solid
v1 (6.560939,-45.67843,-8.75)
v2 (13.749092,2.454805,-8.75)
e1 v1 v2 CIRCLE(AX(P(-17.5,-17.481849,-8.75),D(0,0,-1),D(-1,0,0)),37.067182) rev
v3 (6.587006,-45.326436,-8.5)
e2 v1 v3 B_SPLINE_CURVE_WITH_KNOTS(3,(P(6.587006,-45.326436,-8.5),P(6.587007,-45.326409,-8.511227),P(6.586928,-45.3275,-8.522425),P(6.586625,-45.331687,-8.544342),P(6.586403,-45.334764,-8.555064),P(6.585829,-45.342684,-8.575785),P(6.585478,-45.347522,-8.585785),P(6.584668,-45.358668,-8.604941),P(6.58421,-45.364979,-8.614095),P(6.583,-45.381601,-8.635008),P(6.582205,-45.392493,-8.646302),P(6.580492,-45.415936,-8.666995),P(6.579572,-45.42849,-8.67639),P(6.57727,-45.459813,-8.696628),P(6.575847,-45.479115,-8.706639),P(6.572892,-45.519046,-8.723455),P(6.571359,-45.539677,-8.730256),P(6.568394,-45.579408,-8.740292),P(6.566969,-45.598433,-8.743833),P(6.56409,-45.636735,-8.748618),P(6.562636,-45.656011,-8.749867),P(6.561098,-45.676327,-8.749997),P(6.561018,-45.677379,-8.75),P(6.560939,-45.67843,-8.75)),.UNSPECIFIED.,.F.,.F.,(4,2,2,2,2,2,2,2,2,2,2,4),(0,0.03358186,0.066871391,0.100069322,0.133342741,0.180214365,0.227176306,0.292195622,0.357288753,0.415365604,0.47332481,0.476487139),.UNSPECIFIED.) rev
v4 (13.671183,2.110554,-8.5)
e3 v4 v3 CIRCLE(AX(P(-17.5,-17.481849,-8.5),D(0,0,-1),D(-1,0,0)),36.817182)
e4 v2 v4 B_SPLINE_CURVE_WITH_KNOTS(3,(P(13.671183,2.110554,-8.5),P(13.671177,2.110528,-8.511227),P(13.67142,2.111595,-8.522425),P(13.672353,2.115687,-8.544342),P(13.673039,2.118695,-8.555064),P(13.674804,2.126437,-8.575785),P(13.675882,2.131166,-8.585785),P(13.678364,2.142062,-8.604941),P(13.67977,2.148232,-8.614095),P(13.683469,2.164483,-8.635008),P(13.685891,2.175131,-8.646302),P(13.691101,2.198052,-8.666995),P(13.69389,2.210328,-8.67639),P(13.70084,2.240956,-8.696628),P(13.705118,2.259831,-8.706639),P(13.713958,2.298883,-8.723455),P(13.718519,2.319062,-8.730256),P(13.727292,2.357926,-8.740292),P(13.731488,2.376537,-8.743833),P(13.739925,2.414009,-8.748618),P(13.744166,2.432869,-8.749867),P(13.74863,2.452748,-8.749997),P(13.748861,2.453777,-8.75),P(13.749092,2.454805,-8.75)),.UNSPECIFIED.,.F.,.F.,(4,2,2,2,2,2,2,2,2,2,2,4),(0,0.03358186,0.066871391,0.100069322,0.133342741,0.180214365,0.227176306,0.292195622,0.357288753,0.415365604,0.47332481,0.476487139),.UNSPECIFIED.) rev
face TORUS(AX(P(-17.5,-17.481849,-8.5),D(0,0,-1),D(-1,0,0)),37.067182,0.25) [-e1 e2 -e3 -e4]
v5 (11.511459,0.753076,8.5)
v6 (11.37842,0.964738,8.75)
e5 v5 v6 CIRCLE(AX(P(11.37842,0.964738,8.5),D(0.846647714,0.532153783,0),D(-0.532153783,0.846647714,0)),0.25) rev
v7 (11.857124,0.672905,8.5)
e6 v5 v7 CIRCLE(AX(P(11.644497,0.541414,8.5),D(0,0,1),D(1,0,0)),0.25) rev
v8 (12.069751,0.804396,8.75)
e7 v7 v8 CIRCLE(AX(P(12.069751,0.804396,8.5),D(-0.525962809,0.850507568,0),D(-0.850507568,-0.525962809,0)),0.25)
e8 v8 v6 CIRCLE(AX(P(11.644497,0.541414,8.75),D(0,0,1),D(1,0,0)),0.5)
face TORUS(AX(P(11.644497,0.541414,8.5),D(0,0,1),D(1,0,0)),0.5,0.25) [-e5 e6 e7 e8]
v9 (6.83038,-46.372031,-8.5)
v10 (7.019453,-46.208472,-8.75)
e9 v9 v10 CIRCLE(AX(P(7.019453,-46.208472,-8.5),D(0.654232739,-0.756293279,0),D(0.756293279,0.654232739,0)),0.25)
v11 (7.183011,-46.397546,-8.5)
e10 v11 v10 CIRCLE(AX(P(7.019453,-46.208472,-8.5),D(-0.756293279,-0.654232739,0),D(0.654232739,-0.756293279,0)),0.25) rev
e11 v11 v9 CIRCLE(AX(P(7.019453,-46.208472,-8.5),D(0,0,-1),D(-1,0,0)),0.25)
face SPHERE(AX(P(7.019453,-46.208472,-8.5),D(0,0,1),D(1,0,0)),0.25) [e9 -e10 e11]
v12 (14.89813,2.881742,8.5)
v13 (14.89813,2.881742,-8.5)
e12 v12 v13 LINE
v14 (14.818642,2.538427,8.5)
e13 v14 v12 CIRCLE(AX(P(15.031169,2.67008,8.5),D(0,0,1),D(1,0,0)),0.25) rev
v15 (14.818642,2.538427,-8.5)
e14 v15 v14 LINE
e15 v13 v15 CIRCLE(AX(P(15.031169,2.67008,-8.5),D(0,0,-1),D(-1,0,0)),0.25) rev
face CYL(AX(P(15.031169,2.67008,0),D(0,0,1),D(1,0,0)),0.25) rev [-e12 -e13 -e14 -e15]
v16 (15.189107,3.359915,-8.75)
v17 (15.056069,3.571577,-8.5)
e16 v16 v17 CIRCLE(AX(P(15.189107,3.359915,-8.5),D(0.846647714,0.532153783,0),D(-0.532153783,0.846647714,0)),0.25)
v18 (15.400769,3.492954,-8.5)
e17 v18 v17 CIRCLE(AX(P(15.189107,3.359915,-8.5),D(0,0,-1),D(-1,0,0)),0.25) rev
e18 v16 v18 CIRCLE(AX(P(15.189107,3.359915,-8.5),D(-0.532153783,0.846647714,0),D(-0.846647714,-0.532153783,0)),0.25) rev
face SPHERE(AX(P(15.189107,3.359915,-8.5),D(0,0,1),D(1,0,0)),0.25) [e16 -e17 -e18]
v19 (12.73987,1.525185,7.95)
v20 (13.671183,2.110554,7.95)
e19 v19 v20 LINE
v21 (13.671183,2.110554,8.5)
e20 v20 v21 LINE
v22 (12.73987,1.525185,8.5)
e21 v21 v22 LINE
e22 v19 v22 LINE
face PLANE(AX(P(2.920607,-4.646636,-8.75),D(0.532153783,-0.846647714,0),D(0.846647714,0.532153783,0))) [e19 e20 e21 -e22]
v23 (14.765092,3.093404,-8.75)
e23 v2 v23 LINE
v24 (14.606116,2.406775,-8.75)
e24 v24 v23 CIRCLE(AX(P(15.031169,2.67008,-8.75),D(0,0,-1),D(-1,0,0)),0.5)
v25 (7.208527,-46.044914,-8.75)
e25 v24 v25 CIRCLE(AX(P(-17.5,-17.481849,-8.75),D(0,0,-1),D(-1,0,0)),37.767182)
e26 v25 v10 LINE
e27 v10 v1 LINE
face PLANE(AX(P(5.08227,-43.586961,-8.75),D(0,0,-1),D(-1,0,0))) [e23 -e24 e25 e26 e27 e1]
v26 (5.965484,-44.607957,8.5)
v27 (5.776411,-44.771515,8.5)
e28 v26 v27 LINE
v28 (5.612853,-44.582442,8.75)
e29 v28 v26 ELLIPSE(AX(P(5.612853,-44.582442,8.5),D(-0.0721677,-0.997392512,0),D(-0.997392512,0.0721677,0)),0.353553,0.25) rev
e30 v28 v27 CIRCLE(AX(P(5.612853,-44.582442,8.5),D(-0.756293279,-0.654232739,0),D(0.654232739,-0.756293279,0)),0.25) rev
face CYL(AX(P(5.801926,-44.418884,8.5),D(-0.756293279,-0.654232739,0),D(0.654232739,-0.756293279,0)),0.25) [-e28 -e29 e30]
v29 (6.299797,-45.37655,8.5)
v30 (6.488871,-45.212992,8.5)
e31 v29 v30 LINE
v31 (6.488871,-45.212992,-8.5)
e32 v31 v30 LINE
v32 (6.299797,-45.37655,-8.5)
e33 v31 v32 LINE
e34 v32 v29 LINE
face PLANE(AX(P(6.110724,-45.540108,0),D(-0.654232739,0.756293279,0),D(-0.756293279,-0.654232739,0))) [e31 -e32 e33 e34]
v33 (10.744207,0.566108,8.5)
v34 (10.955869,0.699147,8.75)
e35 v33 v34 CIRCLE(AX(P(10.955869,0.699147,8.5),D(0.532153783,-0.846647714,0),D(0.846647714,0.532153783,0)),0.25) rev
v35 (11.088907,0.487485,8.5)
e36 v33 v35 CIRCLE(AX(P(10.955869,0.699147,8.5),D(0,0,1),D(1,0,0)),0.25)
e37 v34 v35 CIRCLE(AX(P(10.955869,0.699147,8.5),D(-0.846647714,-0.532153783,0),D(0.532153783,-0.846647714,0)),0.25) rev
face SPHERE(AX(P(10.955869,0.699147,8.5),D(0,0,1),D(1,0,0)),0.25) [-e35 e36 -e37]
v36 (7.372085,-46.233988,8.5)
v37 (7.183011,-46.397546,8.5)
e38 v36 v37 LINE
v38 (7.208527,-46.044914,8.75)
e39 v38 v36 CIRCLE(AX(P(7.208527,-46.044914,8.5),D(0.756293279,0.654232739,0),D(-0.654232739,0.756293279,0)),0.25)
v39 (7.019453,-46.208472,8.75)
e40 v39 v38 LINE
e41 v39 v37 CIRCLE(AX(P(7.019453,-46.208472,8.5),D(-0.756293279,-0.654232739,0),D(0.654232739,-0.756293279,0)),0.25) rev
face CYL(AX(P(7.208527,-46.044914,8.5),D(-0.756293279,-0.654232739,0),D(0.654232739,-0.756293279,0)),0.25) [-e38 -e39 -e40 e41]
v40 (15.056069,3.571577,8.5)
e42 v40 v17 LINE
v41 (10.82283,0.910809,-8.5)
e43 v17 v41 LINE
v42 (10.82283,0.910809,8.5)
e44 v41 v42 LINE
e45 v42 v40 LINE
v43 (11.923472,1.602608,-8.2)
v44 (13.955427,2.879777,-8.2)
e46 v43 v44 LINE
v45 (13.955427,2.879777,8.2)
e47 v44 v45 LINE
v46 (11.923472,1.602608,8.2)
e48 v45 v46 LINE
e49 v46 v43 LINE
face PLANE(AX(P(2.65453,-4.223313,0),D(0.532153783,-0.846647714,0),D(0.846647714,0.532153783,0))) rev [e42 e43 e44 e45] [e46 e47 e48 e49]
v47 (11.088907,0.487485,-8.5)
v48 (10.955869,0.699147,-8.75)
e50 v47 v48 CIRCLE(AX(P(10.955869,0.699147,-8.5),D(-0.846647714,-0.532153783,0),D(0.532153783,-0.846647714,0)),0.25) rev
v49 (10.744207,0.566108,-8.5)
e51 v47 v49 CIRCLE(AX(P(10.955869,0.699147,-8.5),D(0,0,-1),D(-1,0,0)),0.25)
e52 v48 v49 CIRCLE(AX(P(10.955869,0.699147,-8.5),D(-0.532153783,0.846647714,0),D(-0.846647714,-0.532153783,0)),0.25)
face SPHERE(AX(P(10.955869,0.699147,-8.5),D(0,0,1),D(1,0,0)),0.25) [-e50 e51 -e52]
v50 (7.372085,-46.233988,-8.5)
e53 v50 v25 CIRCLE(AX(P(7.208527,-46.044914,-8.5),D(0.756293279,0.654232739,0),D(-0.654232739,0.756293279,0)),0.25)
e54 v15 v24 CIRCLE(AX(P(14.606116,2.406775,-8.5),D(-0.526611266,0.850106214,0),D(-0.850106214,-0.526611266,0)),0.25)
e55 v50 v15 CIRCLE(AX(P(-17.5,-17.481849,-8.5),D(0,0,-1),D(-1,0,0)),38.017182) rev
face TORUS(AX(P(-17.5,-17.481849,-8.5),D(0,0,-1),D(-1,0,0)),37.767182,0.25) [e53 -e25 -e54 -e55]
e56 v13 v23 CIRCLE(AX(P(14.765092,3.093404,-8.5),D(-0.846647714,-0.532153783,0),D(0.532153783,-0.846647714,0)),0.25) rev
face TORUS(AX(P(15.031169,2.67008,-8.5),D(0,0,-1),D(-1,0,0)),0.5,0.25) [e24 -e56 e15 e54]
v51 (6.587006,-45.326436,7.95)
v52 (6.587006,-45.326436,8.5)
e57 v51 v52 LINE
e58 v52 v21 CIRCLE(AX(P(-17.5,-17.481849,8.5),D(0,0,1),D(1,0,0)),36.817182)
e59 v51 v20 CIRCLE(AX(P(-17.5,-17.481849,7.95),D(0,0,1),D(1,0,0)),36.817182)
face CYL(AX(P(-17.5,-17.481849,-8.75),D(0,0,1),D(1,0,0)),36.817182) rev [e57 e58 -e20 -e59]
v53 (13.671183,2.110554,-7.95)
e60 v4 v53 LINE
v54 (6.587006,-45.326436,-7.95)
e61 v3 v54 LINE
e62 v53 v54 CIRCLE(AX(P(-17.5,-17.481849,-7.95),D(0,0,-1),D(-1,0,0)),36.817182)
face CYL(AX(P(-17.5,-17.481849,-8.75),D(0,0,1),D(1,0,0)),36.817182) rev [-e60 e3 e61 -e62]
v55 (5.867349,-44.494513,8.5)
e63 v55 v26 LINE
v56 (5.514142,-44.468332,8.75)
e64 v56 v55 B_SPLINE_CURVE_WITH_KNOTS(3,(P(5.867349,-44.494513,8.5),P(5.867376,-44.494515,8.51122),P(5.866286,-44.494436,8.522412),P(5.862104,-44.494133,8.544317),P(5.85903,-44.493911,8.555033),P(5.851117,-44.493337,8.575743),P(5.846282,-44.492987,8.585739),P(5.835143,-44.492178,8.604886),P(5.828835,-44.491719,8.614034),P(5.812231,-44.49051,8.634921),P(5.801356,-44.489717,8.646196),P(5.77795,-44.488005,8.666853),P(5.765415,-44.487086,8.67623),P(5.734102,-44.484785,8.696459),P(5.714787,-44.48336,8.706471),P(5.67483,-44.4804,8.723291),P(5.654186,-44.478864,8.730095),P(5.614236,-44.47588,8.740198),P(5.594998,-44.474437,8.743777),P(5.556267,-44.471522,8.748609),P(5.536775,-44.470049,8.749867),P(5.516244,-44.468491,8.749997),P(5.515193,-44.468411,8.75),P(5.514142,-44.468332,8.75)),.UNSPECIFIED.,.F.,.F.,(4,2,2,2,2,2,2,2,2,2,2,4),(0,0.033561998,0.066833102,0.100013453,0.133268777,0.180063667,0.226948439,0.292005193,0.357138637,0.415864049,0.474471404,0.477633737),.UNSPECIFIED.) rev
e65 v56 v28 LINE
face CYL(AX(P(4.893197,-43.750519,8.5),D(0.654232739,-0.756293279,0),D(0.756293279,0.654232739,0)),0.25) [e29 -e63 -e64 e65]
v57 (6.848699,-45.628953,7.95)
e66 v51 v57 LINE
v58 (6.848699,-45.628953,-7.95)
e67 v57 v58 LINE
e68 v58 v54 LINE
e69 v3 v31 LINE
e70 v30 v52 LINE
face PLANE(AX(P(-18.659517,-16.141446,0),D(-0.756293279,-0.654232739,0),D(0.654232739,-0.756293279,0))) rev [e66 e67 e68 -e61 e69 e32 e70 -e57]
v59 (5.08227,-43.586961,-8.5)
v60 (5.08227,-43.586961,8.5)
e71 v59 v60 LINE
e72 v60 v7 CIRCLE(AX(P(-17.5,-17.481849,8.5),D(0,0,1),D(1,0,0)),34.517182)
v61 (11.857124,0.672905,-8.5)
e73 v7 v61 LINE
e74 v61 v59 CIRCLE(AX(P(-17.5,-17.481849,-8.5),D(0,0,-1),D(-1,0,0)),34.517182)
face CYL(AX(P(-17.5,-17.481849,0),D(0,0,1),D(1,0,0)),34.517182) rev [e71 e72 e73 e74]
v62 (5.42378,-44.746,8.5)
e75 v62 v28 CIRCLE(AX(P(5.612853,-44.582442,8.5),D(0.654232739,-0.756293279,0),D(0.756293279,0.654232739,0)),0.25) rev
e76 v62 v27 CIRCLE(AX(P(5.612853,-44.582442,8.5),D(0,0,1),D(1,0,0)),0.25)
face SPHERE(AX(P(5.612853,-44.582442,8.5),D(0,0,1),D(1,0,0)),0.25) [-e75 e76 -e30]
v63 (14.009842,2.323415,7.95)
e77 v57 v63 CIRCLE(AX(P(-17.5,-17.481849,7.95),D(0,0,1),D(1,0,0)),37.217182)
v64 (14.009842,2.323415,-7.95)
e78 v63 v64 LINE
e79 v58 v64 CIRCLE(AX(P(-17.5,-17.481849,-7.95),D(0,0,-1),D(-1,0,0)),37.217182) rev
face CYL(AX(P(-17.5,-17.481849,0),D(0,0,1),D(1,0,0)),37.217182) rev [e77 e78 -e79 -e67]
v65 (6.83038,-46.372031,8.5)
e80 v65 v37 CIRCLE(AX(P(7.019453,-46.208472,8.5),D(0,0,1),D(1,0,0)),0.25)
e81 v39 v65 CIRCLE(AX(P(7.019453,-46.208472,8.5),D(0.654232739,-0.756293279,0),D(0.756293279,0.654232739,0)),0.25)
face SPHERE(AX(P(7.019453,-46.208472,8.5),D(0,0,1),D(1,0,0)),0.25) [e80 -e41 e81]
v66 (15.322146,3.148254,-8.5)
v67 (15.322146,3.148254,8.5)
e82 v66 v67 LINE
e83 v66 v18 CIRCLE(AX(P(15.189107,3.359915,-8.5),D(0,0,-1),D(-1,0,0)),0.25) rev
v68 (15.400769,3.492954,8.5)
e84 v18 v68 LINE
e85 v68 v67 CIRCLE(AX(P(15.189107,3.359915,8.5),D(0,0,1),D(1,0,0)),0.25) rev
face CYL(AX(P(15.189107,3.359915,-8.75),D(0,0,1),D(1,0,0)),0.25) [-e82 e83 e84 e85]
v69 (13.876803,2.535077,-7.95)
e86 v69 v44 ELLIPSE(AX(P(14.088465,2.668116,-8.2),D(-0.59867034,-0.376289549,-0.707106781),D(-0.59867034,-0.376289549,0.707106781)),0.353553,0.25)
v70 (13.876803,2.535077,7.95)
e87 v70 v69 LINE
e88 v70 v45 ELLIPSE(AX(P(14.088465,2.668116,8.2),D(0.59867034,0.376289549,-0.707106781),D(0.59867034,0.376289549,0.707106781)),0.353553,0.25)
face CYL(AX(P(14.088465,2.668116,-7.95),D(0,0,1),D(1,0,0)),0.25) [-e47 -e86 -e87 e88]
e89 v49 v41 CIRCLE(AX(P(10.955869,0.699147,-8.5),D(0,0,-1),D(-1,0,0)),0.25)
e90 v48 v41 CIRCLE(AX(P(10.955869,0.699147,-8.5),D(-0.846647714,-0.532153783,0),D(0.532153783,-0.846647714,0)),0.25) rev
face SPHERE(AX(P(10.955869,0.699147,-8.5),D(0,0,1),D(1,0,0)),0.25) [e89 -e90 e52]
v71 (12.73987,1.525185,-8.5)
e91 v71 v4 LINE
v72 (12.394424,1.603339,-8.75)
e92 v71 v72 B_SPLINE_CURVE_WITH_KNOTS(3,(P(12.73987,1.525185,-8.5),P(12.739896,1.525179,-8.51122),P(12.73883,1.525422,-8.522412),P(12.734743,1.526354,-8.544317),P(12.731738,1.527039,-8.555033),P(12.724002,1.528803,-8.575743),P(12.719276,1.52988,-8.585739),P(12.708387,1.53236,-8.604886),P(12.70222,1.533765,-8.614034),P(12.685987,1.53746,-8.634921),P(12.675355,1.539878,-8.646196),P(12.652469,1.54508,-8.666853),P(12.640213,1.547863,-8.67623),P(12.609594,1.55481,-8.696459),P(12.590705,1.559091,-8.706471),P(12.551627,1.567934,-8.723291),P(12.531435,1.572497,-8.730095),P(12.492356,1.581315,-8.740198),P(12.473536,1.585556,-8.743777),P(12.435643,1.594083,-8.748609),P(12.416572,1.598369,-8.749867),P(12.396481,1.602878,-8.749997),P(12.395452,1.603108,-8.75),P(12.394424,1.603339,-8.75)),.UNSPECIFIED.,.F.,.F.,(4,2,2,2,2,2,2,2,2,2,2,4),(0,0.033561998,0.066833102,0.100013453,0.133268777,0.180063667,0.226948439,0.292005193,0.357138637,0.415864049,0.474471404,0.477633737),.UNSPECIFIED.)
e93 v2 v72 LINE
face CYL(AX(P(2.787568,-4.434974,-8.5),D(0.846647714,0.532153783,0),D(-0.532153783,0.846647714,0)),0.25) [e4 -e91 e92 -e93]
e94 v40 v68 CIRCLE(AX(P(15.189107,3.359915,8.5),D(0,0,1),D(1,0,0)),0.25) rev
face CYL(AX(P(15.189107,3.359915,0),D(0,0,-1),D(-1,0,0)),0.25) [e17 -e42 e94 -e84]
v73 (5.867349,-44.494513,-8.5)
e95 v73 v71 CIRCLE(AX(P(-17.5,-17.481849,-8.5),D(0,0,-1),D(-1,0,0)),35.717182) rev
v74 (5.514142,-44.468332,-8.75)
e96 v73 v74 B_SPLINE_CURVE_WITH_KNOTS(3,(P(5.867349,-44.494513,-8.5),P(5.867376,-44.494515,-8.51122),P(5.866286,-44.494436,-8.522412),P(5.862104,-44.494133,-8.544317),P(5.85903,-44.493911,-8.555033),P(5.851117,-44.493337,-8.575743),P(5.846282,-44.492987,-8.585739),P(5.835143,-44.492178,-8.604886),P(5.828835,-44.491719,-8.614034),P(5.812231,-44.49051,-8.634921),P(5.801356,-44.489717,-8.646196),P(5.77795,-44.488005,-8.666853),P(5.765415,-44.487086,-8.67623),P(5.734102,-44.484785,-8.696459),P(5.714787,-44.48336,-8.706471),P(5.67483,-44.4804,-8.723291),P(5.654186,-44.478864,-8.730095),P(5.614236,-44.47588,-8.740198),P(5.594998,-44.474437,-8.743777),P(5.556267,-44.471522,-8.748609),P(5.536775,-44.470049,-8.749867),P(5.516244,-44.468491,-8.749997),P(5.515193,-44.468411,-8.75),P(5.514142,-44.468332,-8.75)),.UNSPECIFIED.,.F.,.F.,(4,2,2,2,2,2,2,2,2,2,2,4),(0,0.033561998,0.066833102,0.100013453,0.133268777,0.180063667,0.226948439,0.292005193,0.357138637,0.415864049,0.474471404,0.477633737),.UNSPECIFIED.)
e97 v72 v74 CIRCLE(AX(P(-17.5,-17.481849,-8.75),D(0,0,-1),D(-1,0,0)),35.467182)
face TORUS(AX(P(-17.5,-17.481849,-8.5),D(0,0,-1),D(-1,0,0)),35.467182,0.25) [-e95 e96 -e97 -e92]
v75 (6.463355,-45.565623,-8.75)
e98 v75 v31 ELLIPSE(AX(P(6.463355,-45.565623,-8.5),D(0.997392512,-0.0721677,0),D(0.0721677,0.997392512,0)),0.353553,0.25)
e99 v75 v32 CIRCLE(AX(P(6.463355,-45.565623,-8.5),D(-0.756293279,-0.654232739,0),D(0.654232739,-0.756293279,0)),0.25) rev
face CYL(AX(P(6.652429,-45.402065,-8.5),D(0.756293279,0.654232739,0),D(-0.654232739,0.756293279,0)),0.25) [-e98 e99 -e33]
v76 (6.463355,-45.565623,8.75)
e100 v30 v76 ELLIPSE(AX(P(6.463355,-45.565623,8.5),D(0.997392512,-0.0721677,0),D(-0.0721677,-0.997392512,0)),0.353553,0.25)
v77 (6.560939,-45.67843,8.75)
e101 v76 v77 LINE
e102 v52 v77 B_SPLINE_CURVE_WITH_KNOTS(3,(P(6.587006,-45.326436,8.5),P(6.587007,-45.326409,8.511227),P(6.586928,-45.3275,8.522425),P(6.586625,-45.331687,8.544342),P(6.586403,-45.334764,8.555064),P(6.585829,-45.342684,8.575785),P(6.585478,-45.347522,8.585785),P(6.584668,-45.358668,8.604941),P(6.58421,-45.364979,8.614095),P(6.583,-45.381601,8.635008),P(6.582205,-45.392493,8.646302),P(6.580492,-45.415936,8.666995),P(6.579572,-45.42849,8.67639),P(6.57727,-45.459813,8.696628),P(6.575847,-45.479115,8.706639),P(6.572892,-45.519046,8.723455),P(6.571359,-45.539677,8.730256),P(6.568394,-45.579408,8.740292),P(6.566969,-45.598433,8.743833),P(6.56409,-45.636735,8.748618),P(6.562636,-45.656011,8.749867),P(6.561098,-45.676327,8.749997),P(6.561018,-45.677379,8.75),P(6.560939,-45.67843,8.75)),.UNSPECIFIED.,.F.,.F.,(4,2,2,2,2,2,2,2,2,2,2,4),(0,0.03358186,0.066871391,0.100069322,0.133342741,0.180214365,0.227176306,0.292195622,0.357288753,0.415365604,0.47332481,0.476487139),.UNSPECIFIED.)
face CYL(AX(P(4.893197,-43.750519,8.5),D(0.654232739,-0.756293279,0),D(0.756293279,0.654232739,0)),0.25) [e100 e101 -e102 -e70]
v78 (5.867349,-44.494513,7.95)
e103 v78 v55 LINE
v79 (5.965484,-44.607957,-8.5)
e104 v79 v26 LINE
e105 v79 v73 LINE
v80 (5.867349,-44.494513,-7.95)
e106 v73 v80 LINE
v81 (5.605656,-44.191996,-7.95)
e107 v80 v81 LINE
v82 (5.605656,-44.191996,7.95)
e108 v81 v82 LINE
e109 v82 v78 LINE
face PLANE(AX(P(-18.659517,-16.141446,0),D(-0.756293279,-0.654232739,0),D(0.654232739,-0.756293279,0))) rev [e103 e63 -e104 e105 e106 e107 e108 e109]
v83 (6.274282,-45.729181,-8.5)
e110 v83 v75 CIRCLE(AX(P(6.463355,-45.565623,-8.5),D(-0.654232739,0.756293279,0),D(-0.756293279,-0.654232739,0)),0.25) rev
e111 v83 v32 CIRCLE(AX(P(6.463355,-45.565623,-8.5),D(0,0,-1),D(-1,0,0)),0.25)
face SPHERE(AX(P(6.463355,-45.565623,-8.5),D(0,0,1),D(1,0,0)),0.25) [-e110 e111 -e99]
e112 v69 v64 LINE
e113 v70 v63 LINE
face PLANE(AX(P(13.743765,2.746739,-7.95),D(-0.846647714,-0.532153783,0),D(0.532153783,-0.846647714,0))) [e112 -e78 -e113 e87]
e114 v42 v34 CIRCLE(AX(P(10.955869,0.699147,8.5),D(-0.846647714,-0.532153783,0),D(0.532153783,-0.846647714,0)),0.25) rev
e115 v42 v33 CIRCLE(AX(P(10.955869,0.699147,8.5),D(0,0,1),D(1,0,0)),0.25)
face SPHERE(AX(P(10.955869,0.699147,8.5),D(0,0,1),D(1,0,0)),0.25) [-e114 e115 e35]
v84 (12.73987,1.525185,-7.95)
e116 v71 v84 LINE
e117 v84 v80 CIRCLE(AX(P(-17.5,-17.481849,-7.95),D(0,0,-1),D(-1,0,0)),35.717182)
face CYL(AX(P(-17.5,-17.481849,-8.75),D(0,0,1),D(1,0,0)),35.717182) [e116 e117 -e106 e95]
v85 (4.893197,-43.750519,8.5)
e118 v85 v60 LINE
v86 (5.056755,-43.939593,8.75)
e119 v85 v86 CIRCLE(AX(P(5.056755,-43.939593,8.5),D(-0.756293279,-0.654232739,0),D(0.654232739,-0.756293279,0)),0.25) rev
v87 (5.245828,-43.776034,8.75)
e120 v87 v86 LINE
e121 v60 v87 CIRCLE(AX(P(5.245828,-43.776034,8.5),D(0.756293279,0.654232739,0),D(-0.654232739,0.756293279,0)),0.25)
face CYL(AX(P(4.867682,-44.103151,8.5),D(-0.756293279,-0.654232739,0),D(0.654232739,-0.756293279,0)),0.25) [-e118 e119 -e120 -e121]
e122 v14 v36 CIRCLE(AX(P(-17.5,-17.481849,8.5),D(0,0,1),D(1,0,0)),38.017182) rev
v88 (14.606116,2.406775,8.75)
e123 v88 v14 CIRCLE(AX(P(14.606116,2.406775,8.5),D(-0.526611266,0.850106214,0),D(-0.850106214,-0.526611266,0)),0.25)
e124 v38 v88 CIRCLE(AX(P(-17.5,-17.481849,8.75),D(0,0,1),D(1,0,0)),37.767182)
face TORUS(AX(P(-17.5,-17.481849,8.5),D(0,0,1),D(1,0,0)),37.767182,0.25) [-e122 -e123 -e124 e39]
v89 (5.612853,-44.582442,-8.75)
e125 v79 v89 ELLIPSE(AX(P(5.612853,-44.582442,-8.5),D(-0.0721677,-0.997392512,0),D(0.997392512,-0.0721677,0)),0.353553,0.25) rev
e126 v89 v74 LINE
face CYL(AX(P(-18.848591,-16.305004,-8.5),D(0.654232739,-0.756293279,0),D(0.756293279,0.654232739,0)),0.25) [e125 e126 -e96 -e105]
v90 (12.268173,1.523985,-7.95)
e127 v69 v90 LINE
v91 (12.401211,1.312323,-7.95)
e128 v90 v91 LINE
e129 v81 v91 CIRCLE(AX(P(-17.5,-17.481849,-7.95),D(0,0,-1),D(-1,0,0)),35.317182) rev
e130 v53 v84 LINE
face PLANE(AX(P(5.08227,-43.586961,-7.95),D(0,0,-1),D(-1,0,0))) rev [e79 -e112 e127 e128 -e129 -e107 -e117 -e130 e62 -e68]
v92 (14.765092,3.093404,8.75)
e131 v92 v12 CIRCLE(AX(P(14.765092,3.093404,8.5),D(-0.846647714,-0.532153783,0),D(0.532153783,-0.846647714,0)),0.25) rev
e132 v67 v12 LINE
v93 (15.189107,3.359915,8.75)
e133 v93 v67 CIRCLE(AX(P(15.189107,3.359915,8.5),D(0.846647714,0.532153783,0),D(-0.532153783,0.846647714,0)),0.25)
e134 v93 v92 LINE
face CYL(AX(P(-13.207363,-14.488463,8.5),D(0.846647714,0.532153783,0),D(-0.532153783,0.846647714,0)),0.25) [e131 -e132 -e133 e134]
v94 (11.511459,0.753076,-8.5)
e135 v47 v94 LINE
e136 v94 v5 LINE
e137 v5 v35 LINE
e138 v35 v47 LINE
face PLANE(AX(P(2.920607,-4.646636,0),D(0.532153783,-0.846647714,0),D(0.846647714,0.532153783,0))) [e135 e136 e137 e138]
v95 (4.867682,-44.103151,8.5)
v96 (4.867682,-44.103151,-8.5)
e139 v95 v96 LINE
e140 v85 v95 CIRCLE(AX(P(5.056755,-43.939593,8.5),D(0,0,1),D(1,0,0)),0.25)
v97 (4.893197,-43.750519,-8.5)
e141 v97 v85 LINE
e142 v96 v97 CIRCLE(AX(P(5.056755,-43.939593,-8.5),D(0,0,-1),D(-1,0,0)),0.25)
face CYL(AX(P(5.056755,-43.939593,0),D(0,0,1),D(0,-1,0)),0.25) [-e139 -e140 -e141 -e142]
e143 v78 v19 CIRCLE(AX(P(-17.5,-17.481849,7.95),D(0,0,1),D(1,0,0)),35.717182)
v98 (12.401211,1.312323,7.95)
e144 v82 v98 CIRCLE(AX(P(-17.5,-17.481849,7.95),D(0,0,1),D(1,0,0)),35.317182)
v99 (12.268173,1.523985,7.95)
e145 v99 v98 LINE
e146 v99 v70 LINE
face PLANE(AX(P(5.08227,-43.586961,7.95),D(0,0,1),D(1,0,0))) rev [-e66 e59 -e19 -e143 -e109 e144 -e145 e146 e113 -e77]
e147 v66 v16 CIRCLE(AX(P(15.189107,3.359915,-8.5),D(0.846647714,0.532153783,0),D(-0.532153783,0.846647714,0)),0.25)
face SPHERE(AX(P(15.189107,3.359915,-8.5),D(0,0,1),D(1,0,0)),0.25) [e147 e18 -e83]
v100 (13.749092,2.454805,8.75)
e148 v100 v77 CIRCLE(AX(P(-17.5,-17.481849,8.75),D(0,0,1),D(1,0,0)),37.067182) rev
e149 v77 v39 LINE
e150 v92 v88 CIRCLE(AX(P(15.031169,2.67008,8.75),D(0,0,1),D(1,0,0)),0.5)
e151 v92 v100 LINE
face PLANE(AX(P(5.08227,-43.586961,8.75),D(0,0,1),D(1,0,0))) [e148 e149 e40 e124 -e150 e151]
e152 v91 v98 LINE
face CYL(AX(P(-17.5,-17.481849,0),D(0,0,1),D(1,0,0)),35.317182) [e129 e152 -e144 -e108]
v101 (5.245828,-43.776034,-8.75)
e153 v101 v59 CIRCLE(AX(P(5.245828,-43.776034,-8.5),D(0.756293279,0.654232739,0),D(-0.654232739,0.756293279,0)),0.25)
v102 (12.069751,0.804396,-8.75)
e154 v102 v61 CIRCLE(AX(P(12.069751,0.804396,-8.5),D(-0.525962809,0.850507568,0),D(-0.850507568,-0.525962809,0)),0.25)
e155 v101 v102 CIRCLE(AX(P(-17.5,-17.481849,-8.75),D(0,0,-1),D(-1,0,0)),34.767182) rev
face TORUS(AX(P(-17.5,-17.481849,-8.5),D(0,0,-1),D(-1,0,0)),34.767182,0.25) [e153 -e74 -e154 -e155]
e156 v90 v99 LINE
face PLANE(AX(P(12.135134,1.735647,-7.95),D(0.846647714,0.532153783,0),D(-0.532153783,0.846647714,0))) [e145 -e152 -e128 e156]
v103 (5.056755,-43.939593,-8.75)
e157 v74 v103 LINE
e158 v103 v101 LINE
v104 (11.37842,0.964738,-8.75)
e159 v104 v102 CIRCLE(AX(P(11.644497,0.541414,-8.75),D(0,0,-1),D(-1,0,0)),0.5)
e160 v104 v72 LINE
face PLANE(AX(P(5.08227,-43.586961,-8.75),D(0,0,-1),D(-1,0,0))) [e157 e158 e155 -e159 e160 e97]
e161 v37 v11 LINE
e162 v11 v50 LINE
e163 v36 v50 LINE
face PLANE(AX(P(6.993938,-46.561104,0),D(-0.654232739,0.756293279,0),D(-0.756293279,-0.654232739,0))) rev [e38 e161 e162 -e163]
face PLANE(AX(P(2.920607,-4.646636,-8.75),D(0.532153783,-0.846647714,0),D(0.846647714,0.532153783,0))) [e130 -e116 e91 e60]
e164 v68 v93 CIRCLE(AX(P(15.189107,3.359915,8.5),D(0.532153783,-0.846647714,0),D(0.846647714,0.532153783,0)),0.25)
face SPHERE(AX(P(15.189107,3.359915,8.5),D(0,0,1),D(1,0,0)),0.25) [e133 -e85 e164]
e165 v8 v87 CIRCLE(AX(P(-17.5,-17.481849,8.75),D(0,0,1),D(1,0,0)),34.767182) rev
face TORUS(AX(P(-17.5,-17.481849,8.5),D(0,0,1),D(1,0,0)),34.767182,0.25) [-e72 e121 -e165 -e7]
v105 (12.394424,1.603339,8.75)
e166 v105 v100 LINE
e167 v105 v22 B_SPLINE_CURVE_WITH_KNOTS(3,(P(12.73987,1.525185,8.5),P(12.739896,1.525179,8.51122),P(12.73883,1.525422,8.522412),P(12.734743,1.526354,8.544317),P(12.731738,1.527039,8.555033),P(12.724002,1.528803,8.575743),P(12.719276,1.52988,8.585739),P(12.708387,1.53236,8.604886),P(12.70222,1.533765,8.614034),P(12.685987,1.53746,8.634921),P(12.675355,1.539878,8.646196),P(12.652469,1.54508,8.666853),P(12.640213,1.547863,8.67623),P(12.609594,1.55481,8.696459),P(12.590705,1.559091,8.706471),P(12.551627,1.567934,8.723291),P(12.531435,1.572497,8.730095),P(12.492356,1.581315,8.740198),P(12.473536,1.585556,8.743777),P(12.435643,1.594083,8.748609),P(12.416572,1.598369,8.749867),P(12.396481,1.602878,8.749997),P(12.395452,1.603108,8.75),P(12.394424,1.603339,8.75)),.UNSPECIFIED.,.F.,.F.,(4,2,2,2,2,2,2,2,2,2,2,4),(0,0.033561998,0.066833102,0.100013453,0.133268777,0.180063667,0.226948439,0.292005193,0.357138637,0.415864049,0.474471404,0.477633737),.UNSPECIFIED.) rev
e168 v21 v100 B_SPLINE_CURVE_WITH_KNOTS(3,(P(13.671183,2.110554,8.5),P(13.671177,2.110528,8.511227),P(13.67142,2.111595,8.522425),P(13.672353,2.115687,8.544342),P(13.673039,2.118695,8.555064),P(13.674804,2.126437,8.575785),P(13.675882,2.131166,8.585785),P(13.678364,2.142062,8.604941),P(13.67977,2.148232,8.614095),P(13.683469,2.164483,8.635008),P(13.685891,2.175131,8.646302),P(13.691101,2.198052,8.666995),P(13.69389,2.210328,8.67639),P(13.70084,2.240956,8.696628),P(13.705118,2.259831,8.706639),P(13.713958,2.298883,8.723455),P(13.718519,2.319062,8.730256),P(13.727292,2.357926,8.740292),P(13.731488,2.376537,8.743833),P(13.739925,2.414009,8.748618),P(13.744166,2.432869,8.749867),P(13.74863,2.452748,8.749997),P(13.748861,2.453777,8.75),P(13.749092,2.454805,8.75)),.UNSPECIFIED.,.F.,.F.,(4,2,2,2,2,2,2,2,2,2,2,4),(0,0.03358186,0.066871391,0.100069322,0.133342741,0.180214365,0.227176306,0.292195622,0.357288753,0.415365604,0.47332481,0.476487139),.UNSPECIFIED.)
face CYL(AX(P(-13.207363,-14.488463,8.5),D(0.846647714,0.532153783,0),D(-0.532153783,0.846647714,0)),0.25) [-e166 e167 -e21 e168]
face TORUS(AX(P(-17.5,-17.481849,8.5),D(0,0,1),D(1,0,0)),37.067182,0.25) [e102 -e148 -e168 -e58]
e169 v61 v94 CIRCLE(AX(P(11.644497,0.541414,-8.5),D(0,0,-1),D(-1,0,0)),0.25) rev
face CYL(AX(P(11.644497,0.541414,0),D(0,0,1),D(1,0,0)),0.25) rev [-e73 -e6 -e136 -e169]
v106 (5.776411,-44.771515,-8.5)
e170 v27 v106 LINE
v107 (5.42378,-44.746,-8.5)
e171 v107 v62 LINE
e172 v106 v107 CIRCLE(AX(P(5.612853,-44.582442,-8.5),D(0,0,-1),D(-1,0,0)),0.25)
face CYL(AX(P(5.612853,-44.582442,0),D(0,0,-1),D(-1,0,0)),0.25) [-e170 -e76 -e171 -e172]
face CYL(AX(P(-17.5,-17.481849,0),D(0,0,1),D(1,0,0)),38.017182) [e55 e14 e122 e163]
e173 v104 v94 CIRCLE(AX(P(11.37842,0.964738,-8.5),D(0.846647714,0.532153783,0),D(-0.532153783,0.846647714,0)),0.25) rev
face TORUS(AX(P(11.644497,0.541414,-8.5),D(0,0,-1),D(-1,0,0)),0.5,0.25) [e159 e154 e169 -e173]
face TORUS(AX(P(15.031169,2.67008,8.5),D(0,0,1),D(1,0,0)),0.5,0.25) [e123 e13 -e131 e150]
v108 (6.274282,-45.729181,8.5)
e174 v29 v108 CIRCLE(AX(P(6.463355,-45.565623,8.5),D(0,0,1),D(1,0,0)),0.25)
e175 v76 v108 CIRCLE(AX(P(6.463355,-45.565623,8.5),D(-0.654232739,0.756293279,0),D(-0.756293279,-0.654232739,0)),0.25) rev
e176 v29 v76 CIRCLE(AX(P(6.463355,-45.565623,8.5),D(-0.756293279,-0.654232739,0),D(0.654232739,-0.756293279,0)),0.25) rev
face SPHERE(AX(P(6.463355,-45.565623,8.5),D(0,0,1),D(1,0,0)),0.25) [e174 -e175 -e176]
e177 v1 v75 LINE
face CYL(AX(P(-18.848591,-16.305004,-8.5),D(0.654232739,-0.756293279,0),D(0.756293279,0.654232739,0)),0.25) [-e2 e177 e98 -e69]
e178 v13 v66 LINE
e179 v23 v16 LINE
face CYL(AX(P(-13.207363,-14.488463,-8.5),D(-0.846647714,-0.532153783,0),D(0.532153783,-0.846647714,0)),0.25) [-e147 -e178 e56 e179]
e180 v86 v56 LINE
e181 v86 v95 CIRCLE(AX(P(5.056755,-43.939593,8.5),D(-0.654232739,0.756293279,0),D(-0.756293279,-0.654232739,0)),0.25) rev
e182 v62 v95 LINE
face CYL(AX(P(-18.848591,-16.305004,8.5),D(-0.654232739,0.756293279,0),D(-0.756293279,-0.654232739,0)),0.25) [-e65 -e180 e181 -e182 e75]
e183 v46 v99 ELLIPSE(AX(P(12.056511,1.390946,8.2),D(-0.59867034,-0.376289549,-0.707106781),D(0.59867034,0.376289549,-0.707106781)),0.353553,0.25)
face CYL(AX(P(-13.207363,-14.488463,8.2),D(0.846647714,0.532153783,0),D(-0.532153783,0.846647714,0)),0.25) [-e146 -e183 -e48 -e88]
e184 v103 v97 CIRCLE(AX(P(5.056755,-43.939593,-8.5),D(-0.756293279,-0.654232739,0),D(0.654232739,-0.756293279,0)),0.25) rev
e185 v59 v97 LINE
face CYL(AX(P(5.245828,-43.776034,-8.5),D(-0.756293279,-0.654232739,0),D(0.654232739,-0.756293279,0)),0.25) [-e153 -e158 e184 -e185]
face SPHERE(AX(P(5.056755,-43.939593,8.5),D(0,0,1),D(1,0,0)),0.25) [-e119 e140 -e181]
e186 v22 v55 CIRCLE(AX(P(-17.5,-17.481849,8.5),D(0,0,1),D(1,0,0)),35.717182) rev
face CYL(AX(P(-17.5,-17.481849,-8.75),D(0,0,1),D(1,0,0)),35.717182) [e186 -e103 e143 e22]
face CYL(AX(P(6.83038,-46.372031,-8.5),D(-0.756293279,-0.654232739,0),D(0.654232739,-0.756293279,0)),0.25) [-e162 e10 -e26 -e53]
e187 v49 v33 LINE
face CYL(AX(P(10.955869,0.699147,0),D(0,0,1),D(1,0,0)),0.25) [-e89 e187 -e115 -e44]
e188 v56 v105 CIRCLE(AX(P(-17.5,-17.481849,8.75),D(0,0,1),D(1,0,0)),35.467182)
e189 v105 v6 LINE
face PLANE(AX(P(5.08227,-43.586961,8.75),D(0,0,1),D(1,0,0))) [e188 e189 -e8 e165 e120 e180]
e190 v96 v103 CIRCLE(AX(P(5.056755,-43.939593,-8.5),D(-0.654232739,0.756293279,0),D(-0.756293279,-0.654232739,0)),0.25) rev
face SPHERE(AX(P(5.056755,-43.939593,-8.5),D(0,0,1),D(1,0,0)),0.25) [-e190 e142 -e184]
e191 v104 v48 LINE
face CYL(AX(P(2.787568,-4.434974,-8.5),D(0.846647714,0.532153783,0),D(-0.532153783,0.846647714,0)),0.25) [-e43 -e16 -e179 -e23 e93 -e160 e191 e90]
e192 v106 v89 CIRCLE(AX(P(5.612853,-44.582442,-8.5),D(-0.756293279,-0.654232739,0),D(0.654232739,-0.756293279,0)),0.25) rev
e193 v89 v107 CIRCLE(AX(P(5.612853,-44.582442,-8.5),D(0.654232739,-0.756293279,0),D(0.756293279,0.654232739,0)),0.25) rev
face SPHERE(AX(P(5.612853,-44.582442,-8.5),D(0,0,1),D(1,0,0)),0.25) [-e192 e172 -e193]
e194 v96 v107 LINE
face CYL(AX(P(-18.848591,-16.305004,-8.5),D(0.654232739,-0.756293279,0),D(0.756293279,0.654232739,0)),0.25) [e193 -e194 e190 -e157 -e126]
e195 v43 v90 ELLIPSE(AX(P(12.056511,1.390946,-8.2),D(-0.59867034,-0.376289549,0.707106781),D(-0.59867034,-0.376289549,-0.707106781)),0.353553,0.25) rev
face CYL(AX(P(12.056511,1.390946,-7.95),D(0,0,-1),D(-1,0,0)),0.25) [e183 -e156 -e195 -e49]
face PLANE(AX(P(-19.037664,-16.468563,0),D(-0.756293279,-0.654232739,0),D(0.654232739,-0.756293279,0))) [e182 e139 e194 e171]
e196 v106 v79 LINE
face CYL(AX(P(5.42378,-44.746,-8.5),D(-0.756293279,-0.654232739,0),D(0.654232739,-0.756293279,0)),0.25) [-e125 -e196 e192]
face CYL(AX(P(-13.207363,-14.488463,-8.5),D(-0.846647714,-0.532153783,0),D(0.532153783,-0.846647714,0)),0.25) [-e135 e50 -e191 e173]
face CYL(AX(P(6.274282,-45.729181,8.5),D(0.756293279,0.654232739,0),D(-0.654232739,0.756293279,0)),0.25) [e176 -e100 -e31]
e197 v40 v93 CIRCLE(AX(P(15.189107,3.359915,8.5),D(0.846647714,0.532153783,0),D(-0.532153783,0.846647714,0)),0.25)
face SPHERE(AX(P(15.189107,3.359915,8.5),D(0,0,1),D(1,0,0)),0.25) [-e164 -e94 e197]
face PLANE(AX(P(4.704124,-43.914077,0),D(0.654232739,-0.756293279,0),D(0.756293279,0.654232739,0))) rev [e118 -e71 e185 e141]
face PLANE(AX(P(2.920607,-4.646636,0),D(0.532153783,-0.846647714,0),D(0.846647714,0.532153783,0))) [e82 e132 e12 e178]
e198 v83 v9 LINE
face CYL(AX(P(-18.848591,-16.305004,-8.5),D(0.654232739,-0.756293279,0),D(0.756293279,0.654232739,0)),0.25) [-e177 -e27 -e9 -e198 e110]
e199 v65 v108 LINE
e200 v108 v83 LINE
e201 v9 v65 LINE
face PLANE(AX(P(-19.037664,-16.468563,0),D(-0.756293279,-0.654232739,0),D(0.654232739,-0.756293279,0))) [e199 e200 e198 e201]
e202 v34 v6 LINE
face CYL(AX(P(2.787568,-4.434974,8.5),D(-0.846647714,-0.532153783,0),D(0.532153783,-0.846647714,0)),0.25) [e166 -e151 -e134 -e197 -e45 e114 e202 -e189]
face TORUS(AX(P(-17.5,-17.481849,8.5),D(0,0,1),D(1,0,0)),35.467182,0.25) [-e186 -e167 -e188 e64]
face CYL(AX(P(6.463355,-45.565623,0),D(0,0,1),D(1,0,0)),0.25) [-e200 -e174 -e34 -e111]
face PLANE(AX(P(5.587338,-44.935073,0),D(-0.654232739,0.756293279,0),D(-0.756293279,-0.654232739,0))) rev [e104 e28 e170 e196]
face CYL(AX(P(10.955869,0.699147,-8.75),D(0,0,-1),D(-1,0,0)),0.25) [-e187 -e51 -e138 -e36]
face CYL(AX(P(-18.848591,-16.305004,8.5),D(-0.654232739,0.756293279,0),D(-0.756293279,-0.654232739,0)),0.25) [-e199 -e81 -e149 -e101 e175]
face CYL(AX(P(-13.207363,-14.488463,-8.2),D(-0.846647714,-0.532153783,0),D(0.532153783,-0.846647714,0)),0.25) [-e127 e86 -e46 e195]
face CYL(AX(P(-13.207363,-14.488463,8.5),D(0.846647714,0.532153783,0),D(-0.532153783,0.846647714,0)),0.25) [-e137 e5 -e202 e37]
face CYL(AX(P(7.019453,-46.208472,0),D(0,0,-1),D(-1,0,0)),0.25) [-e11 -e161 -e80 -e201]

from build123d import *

# Parameters (mm, degrees)
SKETCH10_W              = 3.5
SKETCH10_H              = 17.5
SHELL1_T                = -0.8
SKETCH11_W              = 5.5
SKETCH11_H              = 17.5
SKETCH11_W_2            = 1.9
SKETCH11_H_2            = 15.9
BOSS_EXTRUDE1_DEPTH     = 0.5
SKETCH12_W              = 15.9
SKETCH12_H              = 0.55
BOSS_EXTRUDE2_DEPTH     = 0.5
CUT_EXTRUDE1_DEPTH      = 54.806515772
CUT_EXTRUDE1_DEPTH_BACK = 54.806515772
FILLET1_R               = 0.25


with BuildPart() as part:
    # Sweep1: sweep along a path in Sketch7
    with BuildLine(Plane.XY) as sweep1_path:
        ThreePointArc((11.723892809, 0.886599981), (16.638600451, -22.580062041), (5.082270205, -43.586961119))
    # Sketch10 → Sweep1 (sweep)
    with BuildSketch(Plane(origin=(0, -17.481848747, 0), x_dir=(1, 0, 0), z_dir=(0, 1, 0))):
        with Locations((18.767181512, 0)):
            Rectangle(SKETCH10_W, SKETCH10_H)
    sweep(path=sweep1_path.line)

    # Shell1
    shell1_openings = [part.faces().sort_by_distance(p)[0] for p in [
        (6.227177499, -44.910474357, 0),
        (13.205526307, 1.817869101, 0),
    ]]
    offset(amount=SHELL1_T, openings=shell1_openings, kind=Kind.INTERSECTION)

    # Sketch11 → Boss-Extrude1 (add)
    with BuildSketch(Plane(origin=(2.920606872, -4.646636383, 0), x_dir=(0.8466477136319881, 0.5321537832259836, 0), z_dir=(-0.5321537832259836, 0.8466477136319881, 0))):
        with Locations((12.147814575, 0)):
            Rectangle(SKETCH11_W, SKETCH11_H)
        with Locations((12.147814575, 0)):
            Rectangle(SKETCH11_W_2, SKETCH11_H_2, mode=Mode.SUBTRACT)
    extrude(amount=BOSS_EXTRUDE1_DEPTH)

    # Sketch12 → Boss-Extrude2 (add)
    with BuildSketch(Plane(origin=(-18.659517469, -16.141446142, 0), x_dir=(0, 0, 1), z_dir=(-0.7562932785342891, -0.654232739049229, 0))):
        Polygon((8.75, -36.289513283), (-8.75, -36.289513283), (-8.75, -37.639513283), (-7.95, -37.639513283), (-7.95, -37.089513283), (7.95, -37.089513283), (7.95, -37.639513283), (8.75, -37.639513283), align=None)
        with Locations((0, -37.364513283)):
            Rectangle(SKETCH12_W, SKETCH12_H)
        with Locations((0, -38.714513283)):
            Rectangle(SKETCH12_W, SKETCH12_H)
        Polygon((-7.95, -38.439513283), (-8.75, -38.439513283), (-8.75, -39.789513283), (8.75, -39.789513283), (8.75, -38.439513283), (7.95, -38.439513283), (7.95, -38.989513283), (-7.95, -38.989513283), align=None)
    extrude(amount=BOSS_EXTRUDE2_DEPTH)

    # Sketch13 → Cut-Extrude1 (cut, two sides: drawn at the far end of the back side and taken through both)
    with BuildSketch(Plane.XY.offset(8.75).offset(-CUT_EXTRUDE1_DEPTH_BACK)):
        with BuildLine():
            Line((13.67118255, 2.110553682), (12.739870065, 1.525184521))
            ThreePointArc((12.739870065, 1.525184521), (17.825438969, -22.75730293), (5.867349492, -44.494513054))
            Line((5.867349492, -44.494513054), (6.587005505, -45.32643566))
            ThreePointArc((6.587005505, -45.32643566), (18.913374277, -22.919773746), (13.67118255, 2.110553682))
        make_face()
    extrude(amount=CUT_EXTRUDE1_DEPTH + CUT_EXTRUDE1_DEPTH_BACK, mode=Mode.SUBTRACT)

    # Fillet1
    fillet1_edges = [part.edges().sort_by_distance(p)[0] for p in [
        (15.110483663, 3.015215114, -8.75),
        (15.400769074, 3.492953934, -8.75),
        (12.939449416, 2.241192958, -8.75),
        (10.744206649, 0.566108126, -8.75),
        (11.300568952, 0.620523089, -8.75),
        (16.638600451, -22.580062041, -8.75),
        (4.893196886, -43.750519304, -8.75),
        (5.145730665, -44.424575452, -8.75),
        (5.776411083, -44.77151523, -8.75),
        (5.916416947, -44.551235049, -8.75),
        (17.825438969, -22.75730293, -8.75),
        (13.205526307, 1.817869101, -8.75),
        (18.913374277, -22.919773746, -8.75),
        (6.53793805, -45.269713664, -8.75),
        (6.299797275, -45.376549853, -8.75),
        (6.552331054, -46.050606001, -8.75),
        (7.183011472, -46.397545779, -8.75),
        (20.100212795, -23.097014635, -8.75),
        (20.100212795, -23.097014635, 8.75),
        (14.687159806, 2.749138222, 0),
        (11.300568952, 0.620523089, 8.75),
        (10.744206649, 0.566108126, 8.75),
        (12.939449416, 2.241192958, 8.75),
        (15.400769074, 3.492953934, 8.75),
        (15.110483663, 3.015215114, 8.75),
        (7.183011472, -46.397545779, 8.75),
        (6.552331054, -46.050606001, 8.75),
        (6.299797275, -45.376549853, 8.75),
        (6.53793805, -45.269713664, 8.75),
        (18.913374277, -22.919773746, 8.75),
        (13.205526307, 1.817869101, 8.75),
        (17.825438969, -22.75730293, 8.75),
        (5.916416947, -44.551235049, 8.75),
        (5.776411083, -44.77151523, 8.75),
        (5.145730665, -44.424575452, 8.75),
        (4.893196886, -43.750519304, 8.75),
        (16.638600451, -22.580062041, 8.75),
        (12.939449416, 2.241192958, 7.95),
        (13.743764744, 2.746739052, 0),
        (12.939449416, 2.241192958, -7.95),
        (12.135134088, 1.735646864, 0),
        (6.993938153, -46.561103964, 0),
        (6.110723955, -45.540108038, 0),
        (5.587337764, -44.935073415, 0),
        (4.704123566, -43.914077489, 0),
        (11.723892809, 0.886599981, 0),
        (10.877245095, 0.354446198, 0),
        (10.611168203, 0.777770054, 0),
        (15.267730628, 3.704615862, 0),
        (15.53380752, 3.281292005, 0),
    ]]
    fillet(fillet1_edges, radius=FILLET1_R - 0.0001)  # a hair under: the kernel refuses the full size


solid = part.part
